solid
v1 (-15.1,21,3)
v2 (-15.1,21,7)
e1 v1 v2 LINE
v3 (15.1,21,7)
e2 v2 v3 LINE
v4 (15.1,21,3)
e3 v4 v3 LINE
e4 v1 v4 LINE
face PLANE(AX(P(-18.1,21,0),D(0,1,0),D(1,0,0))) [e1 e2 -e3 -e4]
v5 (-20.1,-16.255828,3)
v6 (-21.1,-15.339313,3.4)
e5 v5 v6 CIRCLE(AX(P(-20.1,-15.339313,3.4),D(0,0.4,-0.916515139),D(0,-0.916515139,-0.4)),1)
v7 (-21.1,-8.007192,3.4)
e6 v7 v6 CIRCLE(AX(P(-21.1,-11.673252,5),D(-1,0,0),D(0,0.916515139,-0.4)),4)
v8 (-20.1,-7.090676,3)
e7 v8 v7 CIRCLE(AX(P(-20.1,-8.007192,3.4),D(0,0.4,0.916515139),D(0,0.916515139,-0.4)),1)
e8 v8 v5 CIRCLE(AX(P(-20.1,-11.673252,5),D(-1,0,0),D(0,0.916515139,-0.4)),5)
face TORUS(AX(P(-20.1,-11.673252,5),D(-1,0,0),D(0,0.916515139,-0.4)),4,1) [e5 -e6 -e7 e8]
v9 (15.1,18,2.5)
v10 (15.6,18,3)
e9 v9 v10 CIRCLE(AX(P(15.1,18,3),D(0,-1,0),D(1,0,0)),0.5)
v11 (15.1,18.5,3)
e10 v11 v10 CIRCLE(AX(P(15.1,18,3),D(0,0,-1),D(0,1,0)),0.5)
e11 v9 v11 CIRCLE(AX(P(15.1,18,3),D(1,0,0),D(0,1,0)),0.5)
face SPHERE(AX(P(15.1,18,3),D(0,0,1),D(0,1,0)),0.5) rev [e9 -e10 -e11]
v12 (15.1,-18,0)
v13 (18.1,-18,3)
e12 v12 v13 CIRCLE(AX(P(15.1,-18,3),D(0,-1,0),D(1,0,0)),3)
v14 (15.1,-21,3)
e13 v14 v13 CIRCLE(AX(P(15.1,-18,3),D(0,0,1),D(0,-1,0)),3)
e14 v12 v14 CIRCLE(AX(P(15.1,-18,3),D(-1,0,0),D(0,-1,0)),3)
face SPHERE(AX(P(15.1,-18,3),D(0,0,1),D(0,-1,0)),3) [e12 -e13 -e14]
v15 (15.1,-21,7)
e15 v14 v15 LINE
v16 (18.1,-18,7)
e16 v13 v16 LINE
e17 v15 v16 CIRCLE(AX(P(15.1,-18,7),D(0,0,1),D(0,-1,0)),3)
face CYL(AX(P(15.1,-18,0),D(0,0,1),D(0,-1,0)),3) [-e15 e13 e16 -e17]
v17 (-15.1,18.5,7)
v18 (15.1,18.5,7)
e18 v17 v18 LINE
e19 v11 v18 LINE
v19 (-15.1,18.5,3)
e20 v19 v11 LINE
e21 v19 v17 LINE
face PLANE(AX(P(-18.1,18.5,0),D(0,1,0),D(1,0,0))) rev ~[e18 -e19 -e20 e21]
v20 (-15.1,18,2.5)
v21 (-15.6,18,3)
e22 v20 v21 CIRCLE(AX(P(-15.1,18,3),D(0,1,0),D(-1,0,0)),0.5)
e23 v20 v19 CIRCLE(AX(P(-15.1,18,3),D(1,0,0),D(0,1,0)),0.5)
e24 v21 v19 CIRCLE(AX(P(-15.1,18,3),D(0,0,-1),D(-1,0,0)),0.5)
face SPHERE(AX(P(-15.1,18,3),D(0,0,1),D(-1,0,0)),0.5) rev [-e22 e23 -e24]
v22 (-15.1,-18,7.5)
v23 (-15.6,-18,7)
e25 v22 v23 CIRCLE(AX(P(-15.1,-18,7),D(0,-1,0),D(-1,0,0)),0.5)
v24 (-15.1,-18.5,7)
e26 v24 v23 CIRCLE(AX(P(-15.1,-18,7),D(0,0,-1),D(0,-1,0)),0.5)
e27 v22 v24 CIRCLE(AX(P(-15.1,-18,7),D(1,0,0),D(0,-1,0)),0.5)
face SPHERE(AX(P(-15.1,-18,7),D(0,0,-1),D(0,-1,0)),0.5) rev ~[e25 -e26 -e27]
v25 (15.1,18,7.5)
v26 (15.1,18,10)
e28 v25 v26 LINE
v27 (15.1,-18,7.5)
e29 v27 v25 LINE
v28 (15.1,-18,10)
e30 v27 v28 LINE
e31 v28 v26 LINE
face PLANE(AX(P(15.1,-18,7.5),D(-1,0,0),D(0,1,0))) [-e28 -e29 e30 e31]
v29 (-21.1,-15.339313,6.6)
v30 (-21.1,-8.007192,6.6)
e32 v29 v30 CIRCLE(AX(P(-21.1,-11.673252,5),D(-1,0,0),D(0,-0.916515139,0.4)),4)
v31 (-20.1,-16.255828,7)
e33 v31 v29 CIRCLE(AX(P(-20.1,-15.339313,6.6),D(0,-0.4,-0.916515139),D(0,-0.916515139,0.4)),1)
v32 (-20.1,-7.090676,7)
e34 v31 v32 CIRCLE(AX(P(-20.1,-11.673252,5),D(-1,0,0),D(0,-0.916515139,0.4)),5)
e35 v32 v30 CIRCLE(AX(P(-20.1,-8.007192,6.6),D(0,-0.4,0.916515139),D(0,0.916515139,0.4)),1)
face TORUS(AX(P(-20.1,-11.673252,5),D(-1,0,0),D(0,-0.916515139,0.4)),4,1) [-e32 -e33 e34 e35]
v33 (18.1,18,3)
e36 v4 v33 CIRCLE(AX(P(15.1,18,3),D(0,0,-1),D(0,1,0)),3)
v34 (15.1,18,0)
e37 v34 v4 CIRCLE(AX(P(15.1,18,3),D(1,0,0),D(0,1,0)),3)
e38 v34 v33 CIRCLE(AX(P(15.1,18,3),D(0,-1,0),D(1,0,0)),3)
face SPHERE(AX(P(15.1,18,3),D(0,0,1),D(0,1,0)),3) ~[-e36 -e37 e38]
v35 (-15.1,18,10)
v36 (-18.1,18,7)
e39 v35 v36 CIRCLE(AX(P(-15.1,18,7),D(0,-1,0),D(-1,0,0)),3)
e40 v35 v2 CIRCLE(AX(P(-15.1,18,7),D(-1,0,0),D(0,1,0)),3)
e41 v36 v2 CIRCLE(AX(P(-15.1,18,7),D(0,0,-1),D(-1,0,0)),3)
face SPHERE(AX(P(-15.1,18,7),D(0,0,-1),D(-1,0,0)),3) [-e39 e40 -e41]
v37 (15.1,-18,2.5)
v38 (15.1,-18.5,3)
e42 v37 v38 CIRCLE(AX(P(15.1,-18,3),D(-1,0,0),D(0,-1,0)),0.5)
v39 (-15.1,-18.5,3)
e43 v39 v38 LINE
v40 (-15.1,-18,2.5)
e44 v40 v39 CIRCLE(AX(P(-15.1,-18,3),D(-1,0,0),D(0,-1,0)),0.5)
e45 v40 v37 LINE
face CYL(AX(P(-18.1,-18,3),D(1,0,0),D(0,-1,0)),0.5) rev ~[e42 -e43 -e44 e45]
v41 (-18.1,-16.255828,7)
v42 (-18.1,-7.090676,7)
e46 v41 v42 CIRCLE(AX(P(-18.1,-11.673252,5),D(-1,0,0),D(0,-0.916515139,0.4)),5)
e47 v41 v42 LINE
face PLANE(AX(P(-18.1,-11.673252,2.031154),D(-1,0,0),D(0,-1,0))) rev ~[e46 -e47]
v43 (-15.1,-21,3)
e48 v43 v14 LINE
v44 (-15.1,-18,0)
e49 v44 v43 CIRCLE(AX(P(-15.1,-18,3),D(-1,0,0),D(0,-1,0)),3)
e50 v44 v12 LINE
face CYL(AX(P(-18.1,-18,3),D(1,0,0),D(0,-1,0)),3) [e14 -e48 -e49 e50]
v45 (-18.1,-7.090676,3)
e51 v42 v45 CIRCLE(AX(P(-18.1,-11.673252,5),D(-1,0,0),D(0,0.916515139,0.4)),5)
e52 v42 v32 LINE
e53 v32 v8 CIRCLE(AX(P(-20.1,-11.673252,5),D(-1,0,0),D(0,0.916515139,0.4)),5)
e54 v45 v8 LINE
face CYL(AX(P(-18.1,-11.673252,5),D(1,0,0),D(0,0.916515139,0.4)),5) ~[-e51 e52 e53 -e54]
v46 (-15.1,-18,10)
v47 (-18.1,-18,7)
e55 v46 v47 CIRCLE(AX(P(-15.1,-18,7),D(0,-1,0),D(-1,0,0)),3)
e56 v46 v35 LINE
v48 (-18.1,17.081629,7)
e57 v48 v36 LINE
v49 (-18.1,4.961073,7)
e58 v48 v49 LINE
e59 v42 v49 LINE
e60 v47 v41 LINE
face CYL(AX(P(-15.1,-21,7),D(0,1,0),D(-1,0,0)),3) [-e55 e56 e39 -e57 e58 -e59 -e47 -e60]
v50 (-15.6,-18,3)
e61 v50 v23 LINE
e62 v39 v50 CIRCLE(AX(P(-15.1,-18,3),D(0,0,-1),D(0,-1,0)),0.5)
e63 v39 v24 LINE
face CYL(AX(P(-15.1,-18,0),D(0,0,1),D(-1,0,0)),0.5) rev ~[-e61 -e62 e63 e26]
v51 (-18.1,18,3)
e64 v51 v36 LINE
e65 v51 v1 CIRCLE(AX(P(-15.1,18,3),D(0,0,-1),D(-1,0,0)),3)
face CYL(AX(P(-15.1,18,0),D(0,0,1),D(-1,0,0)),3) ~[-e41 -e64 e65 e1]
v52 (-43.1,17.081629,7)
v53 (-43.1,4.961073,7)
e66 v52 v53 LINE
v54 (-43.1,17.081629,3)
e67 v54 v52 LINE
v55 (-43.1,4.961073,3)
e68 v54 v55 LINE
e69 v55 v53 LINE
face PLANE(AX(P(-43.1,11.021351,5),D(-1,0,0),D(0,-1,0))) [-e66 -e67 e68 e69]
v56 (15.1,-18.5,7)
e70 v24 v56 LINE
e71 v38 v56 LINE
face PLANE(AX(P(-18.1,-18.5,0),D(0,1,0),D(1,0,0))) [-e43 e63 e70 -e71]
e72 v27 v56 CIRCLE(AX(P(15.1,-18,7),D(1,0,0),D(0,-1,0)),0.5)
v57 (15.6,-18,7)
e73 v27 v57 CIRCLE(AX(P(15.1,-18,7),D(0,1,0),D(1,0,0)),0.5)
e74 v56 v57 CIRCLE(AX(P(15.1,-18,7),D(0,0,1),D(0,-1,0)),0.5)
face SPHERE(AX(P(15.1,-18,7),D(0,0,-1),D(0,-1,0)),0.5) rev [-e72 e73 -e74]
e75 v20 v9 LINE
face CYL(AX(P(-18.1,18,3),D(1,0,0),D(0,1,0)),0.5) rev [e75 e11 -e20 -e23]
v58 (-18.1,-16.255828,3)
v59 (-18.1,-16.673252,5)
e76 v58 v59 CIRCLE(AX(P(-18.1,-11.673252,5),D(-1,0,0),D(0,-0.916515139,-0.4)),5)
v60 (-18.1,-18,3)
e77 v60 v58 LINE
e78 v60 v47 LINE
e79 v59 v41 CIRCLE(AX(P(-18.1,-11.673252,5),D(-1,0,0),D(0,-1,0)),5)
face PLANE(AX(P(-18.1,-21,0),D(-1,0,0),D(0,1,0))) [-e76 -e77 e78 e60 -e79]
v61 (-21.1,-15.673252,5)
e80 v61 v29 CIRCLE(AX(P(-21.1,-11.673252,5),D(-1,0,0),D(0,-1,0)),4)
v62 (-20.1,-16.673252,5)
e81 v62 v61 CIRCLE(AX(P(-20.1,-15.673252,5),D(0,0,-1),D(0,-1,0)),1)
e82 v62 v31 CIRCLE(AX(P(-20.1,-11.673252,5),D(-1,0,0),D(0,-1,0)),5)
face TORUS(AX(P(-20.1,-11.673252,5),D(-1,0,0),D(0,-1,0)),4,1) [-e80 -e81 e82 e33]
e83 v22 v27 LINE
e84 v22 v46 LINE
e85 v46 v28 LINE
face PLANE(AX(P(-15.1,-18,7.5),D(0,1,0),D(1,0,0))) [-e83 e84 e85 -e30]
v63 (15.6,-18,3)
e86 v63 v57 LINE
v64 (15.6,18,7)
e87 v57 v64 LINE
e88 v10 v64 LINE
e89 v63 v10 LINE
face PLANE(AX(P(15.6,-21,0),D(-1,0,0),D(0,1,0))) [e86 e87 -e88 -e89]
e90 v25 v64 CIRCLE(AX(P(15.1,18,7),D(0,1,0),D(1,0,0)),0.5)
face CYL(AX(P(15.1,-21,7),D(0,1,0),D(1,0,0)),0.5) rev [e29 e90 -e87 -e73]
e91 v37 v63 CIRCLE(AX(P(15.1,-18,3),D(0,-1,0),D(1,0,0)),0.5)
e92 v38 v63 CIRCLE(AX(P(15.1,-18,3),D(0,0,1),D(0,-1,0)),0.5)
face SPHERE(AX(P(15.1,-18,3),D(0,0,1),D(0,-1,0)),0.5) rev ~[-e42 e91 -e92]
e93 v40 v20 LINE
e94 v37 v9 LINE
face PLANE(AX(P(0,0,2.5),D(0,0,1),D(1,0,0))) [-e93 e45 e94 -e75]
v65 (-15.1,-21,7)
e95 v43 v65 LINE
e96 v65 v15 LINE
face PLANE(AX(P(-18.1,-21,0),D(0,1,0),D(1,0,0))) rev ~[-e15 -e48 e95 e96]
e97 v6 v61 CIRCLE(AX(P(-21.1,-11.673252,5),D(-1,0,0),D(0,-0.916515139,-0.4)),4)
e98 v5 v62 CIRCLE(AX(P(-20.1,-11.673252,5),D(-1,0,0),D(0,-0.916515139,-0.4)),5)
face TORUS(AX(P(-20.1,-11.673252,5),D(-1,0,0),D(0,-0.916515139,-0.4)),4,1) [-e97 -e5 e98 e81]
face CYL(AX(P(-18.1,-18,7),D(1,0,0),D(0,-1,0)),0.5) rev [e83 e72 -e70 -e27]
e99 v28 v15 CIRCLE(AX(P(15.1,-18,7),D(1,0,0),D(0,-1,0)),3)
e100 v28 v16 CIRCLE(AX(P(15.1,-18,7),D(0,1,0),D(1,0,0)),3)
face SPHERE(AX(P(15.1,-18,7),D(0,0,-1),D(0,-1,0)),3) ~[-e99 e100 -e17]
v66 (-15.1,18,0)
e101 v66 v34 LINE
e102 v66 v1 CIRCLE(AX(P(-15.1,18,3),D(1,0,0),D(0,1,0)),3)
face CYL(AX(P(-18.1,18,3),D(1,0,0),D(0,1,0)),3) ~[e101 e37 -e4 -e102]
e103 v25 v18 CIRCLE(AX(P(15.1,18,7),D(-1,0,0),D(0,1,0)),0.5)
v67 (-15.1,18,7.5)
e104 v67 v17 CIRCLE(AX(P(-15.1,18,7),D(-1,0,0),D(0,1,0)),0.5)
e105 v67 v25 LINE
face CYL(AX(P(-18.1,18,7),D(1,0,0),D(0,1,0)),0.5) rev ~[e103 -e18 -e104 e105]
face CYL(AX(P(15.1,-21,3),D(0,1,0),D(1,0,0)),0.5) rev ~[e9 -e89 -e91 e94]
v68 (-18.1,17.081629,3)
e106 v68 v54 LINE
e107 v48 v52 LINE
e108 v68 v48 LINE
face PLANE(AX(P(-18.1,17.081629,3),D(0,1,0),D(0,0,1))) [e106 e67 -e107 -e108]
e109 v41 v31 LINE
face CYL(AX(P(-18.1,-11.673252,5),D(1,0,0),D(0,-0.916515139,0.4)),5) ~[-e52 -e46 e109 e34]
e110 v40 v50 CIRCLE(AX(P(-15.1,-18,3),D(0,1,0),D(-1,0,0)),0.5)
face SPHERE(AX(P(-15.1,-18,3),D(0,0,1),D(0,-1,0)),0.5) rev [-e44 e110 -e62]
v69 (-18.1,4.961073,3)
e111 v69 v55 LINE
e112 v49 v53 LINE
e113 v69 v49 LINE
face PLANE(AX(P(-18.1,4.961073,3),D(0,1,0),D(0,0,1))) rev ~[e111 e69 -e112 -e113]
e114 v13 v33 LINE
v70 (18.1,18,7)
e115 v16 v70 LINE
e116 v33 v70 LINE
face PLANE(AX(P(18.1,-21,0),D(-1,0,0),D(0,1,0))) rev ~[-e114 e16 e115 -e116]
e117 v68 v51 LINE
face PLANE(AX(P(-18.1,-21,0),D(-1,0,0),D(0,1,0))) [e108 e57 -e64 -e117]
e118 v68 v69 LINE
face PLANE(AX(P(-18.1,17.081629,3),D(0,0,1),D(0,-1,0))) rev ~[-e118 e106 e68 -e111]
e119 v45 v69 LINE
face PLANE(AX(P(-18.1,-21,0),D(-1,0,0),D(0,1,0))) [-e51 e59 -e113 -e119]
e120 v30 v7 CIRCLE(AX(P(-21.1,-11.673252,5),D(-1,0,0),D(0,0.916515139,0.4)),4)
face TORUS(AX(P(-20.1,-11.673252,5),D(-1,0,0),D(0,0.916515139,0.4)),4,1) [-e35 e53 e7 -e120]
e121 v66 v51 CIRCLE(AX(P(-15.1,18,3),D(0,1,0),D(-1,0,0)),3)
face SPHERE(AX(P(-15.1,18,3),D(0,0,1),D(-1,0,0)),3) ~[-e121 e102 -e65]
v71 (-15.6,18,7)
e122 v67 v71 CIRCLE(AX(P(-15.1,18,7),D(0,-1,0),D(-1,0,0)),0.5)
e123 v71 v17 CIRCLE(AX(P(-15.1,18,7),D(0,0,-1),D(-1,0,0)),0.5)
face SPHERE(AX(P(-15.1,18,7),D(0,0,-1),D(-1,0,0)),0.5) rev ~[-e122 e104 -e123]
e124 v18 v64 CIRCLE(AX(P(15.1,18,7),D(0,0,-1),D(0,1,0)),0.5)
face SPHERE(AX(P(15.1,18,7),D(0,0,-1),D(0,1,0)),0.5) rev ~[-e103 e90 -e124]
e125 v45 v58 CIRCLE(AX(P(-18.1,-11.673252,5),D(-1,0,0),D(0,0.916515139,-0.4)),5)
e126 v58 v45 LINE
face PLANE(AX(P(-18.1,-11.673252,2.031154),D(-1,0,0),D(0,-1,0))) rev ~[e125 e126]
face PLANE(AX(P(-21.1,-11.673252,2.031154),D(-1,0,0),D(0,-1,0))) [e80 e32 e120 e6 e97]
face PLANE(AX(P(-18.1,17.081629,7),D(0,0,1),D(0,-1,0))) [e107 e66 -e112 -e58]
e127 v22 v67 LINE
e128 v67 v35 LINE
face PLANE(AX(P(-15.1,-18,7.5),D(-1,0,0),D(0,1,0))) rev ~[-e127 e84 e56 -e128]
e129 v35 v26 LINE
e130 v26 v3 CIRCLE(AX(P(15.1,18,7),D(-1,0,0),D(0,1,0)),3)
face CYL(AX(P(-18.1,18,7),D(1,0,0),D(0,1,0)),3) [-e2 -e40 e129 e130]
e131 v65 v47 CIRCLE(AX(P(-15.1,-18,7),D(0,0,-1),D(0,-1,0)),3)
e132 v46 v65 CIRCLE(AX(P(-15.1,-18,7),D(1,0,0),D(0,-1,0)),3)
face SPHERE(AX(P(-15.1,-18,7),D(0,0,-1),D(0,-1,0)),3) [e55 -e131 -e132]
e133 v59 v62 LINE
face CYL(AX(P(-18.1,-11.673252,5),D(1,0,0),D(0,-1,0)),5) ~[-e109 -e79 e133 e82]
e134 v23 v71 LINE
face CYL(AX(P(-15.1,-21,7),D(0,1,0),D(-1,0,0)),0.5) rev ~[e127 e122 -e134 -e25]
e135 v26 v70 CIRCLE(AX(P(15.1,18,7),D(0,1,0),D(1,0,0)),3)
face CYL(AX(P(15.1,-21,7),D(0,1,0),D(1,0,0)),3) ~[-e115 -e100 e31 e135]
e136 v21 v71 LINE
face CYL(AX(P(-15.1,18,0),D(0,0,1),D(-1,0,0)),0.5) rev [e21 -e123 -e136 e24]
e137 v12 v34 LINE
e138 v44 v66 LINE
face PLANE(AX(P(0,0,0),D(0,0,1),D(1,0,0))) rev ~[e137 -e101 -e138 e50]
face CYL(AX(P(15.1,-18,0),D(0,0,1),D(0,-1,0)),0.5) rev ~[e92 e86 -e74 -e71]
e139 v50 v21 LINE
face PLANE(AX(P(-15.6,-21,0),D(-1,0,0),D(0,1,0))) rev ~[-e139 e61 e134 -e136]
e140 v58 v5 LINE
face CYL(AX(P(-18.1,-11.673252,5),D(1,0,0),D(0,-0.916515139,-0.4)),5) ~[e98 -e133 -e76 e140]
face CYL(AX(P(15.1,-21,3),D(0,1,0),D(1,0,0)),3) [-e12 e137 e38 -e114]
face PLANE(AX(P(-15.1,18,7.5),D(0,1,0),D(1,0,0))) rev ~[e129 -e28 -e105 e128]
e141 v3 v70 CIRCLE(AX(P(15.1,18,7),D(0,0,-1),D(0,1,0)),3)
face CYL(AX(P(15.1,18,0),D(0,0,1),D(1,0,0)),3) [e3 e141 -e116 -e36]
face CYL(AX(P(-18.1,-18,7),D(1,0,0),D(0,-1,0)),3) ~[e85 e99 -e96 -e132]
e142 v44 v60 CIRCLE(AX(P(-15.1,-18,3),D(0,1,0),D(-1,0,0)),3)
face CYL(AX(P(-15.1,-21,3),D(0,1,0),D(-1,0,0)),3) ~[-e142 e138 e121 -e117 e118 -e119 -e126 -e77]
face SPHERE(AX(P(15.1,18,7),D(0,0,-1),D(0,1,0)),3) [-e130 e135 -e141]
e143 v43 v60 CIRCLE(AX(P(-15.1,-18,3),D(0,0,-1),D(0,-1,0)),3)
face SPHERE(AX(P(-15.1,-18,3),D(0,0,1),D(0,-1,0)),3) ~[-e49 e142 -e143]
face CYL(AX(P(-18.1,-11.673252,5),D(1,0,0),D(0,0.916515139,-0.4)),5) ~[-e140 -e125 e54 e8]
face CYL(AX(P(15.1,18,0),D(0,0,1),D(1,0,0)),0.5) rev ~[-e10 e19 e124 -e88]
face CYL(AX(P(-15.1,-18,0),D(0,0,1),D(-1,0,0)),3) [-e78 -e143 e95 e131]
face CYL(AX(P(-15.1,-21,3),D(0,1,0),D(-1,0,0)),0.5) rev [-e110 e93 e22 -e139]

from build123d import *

# Parameters (mm, degrees)
F0_W     = 36.2
F0_H     = 42
F1_DEPTH = 10
F2_R     = 3
F3_T     = -2.5
F5_DEPTH = 3
F6_R     = 1
F7_W     = 12.1205560863
F7_H     = 4
F8_DEPTH = 25


# Not quite as in the source:
# - a shell that OpenCascade refuses in one call is made with other operations: the cavity is built on its own and cut out


with BuildPart() as f1:
    # F0 (on Top) → F1 (new body)
    with BuildSketch(Plane.XY):
        Rectangle(F0_W, F0_H)
    extrude(amount=F1_DEPTH)

    # F2
    f2_edges = [f1.edges().sort_by_distance(p)[0] for p in [
        (-18.1, -21, 5),
        (18.1, -21, 5),
        (0, -21, 0),
        (0, -21, 10),
        (-18.1, 21, 5),
        (-18.1, 0, 0),
        (-18.1, 0, 10),
        (18.1, 21, 5),
        (0, 21, 0),
        (0, 21, 10),
        (18.1, 0, 0),
        (18.1, 0, 10),
    ]]
    fillet(f2_edges, radius=F2_R)

    # F3: a shell. OpenCascade refuses it in one call, so the cavity is built on its own and cut out:
    # the body offset inwards by the wall thickness, plus a prism from it out through each open face.
    f3_core = offset(f1.part, amount=F3_T, mode=Mode.PRIVATE)
    f3_exits = [f3_core.faces().sort_by_distance(p)[0] for p in [
        (0, 0, 7.5),
    ]]
    add(f3_core, mode=Mode.SUBTRACT)
    extrude(f3_exits, amount=-F3_T, mode=Mode.SUBTRACT)

    # F4 (on face) → F5 (join)
    with BuildSketch(Plane(origin=(-18.1, 0, 0), x_dir=(0, -1, 0), z_dir=(-1, 0, 0))):
        with BuildLine():
            ThreePointArc((7.0906764033, 3), (11.6732520983, 0), (16.2558277932, 3))
            Line((16.2558277932, 3), (7.0906764033, 3))
        make_face()
        with BuildLine():
            Line((7.0906764033, 7), (16.2558277932, 7))
            ThreePointArc((16.2558277932, 7), (11.6732520983, 10), (7.0906764033, 7))
        make_face()
        with BuildLine():
            ThreePointArc((16.2558277932, 3), (16.5677836629, 3.9784517816), (16.6732520983, 5))
            ThreePointArc((16.6732520983, 5), (16.5677836629, 6.0215482184), (16.2558277932, 7))
            Line((16.2558277932, 7), (7.0906764033, 7))
            ThreePointArc((7.0906764033, 7), (6.6732520983, 5), (7.0906764033, 3))
            Line((7.0906764033, 3), (16.2558277932, 3))
        make_face()
    extrude(amount=F5_DEPTH)

    # F6
    f6_edges = [f1.edges().sort_by_distance(p)[0] for p in [
        (-21.1, -7.090676, 7),
    ]]
    fillet(f6_edges, radius=F6_R)

    # F7 (on face) → F8 (join)
    with BuildSketch(Plane(origin=(-18.1, 0, 0), x_dir=(0, -1, 0), z_dir=(-1, 0, 0))):
        with Locations((-11.0213514417, 5)):
            Rectangle(F7_W, F7_H)
    extrude(amount=F8_DEPTH)


solid = f1.part
